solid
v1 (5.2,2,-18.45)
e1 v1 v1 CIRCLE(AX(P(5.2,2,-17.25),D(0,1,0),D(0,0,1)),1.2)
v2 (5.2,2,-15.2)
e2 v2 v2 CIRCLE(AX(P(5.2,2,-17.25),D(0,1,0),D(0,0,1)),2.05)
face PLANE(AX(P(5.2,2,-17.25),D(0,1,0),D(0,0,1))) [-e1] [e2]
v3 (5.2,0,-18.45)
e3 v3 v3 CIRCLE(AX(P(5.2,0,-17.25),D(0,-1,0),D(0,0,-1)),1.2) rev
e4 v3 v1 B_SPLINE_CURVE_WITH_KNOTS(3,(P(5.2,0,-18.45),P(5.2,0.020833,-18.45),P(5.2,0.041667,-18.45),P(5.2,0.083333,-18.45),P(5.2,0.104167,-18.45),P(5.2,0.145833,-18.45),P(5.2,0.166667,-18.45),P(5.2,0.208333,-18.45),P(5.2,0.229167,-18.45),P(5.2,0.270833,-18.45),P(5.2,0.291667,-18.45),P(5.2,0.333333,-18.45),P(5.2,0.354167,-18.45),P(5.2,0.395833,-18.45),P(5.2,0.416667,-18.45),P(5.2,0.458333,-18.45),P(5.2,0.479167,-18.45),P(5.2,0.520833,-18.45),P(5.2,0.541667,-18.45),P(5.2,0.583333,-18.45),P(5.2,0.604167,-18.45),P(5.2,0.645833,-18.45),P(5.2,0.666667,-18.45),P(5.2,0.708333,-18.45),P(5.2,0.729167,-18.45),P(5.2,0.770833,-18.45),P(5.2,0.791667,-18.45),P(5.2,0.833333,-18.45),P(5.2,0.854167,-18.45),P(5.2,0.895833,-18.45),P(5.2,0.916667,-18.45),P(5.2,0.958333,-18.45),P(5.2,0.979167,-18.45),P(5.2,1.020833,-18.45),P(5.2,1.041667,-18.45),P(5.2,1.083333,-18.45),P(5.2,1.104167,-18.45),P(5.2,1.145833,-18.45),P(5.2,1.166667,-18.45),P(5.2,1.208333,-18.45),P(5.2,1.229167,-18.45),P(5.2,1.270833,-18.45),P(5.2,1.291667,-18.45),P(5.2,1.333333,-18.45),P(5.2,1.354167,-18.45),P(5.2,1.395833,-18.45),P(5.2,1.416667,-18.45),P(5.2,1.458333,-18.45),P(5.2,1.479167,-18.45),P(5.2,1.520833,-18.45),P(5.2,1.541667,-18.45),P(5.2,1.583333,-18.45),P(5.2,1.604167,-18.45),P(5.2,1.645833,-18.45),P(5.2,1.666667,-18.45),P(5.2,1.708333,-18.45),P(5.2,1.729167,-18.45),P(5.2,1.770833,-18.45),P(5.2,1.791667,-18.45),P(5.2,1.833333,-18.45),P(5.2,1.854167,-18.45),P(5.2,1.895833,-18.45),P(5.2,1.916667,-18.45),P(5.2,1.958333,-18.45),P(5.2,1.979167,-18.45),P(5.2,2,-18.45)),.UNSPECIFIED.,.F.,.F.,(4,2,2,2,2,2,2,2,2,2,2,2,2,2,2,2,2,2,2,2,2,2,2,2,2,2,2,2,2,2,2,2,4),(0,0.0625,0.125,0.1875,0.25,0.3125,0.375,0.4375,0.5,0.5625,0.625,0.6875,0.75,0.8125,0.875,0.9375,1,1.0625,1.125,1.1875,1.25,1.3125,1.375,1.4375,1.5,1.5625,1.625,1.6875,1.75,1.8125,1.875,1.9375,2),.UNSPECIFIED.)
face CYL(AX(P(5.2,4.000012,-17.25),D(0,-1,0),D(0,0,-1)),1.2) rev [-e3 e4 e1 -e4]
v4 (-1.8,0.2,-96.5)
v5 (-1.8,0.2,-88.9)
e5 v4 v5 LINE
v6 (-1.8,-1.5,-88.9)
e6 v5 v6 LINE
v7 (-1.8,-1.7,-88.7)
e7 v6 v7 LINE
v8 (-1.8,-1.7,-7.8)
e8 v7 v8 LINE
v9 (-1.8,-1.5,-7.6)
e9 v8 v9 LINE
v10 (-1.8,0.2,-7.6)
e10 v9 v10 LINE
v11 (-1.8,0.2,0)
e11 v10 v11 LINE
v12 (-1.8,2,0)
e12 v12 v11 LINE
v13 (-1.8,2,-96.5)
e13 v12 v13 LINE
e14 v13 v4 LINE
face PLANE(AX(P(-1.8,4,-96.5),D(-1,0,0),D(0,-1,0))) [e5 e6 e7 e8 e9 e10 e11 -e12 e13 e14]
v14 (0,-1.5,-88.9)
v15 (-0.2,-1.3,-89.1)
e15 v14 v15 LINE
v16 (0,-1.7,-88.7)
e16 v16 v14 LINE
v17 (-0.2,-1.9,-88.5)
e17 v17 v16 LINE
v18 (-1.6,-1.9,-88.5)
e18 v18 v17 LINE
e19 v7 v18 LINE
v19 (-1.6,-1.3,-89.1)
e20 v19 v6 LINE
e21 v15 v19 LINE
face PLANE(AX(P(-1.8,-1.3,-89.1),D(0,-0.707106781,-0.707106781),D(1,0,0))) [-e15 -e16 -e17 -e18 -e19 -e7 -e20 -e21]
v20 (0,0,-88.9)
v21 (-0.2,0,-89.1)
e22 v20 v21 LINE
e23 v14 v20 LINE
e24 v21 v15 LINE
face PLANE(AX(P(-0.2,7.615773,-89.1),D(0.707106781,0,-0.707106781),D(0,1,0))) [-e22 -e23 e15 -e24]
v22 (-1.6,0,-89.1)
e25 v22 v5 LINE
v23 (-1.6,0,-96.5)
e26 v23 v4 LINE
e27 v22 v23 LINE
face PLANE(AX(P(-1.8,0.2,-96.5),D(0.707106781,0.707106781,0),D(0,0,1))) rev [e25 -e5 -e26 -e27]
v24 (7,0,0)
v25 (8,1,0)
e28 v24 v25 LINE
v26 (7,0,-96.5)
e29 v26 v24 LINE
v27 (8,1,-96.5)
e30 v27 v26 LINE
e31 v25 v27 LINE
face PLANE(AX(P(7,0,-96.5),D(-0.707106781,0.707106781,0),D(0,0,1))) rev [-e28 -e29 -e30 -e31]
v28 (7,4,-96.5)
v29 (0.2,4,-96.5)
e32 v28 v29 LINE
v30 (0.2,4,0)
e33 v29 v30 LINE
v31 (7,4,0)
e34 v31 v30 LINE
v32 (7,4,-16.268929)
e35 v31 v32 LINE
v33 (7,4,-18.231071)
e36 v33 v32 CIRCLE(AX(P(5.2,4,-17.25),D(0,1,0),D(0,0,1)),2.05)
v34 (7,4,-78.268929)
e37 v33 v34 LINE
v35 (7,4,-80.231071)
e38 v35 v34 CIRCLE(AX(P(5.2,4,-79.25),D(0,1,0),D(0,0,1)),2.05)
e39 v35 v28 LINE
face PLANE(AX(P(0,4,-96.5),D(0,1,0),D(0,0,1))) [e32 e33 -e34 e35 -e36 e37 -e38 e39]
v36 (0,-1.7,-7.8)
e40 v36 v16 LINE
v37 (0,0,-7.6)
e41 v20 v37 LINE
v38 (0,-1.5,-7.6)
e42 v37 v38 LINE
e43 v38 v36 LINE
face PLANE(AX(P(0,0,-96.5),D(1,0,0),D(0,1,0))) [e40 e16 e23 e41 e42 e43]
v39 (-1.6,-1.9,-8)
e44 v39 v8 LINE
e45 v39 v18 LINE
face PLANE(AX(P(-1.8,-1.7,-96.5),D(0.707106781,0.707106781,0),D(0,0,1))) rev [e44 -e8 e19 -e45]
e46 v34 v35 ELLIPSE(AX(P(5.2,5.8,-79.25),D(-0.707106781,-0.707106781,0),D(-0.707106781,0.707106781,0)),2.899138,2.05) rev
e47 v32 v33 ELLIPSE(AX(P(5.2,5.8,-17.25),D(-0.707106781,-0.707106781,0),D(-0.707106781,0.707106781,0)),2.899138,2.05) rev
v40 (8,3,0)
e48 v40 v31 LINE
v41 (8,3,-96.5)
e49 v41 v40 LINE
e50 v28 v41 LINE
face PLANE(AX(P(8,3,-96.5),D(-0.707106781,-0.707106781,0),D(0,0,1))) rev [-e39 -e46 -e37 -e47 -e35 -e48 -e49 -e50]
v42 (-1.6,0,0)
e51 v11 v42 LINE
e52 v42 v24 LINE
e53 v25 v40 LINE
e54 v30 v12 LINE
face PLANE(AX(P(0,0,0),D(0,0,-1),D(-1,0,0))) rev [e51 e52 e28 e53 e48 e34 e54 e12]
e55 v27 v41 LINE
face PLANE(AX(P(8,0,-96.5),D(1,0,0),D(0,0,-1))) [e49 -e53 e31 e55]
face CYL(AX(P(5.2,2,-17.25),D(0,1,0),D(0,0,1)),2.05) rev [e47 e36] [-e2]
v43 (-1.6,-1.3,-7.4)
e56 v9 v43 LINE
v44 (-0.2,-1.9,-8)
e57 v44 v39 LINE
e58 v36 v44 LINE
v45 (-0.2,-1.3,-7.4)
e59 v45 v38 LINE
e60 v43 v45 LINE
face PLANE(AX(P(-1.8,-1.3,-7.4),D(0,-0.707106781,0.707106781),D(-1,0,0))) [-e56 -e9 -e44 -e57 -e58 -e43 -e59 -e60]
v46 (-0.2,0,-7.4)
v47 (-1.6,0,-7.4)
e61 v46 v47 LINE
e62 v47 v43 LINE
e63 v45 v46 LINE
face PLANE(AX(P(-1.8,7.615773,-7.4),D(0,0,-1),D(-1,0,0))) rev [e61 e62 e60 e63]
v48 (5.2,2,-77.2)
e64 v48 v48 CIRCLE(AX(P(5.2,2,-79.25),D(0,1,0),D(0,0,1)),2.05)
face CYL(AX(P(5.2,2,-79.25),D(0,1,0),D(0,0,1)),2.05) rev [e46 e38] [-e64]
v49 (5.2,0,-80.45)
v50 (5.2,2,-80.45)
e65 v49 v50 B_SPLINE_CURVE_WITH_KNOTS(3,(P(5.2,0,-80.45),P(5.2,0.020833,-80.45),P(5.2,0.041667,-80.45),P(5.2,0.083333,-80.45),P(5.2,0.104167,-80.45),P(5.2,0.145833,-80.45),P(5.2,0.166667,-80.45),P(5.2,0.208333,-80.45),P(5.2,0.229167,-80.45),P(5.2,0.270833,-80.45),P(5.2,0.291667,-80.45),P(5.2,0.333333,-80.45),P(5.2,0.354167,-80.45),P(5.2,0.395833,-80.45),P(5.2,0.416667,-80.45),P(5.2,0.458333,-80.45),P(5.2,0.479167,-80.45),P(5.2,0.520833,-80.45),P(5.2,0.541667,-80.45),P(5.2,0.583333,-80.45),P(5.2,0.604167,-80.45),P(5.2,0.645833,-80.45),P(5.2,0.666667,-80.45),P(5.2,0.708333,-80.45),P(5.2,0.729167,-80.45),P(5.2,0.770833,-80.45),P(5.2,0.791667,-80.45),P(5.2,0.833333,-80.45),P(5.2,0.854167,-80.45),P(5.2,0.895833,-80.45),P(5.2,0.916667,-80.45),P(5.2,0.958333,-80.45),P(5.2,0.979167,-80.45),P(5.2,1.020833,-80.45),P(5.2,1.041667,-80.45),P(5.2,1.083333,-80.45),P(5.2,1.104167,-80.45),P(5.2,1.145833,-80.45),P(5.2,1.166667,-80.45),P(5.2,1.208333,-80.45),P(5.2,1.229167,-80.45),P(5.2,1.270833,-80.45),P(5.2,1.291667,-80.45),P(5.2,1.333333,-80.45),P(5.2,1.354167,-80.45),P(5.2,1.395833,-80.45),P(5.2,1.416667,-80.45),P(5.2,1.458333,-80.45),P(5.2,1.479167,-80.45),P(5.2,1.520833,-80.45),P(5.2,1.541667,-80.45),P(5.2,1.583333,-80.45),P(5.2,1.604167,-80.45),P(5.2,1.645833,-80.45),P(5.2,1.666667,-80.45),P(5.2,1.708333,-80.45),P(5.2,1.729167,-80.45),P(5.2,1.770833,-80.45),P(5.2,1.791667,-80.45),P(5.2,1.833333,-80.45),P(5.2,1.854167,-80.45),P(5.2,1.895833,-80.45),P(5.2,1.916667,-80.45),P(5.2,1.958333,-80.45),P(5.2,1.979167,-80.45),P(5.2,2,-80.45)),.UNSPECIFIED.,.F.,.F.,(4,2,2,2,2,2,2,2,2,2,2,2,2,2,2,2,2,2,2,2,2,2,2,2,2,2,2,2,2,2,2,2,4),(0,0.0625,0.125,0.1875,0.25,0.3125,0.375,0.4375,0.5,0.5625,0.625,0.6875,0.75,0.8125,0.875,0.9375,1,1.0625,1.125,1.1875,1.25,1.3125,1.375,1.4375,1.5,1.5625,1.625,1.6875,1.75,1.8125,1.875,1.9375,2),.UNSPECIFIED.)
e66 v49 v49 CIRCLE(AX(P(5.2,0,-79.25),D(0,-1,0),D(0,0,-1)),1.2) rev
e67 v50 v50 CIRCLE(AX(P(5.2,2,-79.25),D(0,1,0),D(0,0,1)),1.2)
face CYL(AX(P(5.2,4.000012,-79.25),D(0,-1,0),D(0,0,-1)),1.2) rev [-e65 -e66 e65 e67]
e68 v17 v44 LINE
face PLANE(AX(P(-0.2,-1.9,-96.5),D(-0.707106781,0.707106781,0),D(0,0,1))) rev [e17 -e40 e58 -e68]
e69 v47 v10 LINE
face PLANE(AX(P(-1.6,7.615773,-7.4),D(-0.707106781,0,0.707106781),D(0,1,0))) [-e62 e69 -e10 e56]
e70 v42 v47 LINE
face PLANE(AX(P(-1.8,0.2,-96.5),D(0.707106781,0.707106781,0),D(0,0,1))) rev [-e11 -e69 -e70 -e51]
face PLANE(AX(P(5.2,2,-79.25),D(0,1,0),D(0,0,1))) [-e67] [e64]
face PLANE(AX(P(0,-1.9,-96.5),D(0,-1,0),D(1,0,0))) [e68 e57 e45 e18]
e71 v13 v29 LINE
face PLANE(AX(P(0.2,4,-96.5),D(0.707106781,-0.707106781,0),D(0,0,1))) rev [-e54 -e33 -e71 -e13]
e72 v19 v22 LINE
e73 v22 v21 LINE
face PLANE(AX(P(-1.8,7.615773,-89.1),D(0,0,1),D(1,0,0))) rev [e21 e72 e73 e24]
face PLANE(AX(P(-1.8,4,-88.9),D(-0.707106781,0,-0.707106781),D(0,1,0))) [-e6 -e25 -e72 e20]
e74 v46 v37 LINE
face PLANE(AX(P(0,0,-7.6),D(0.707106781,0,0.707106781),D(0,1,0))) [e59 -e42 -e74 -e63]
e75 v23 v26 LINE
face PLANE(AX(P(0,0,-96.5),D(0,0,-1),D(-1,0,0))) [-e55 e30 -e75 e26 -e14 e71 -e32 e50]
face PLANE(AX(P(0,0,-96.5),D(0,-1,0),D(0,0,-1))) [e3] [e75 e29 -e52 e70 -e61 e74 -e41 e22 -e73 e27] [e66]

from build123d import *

# Parameters (mm, degrees)
EXTRUDE_1_DEPTH          = 96.5
CHAMFER_1_SIZE           = 1
CHAMFER_2_SIZE           = 1
CUT_EXTRUDE_1_DEPTH      = 98.010617976
CUT_EXTRUDE_1_DEPTH_BACK = 10
SKETCH_2_R               = 1.2
SKETCH_2_3_R             = 2.05
CUT_EXTRUDE_2_DEPTH      = 2
CHAMFER_3_SIZE           = 2
SKETCH_3_W               = 1.8
SKETCH_3_H               = 7.4
CUT_EXTRUDE_3_DEPTH      = 1.9
CHAMFER_4_SIZE           = 0.2
CHAMFER_5_SIZE           = 0.6


with BuildPart() as part:
    # 草图1 → 凸台-拉伸1 (new body)
    with BuildSketch(Plane.XY):
        Polygon((0, 0), (8, 0), (8, 4), (0, 4), (-1.8, 4), (-1.8, -1.9), (0, -1.9), align=None)
    extrude(amount=-EXTRUDE_1_DEPTH)

    # 倒角1
    chamfer_1_edges = [part.edges().sort_by_distance(p)[0] for p in [
        (8, 0, -48.25),
    ]]
    chamfer(chamfer_1_edges, length=CHAMFER_1_SIZE)

    # 倒角2
    chamfer_2_edges = [part.edges().sort_by_distance(p)[0] for p in [
        (8, 4, -48.25),
    ]]
    chamfer(chamfer_2_edges, length=CHAMFER_2_SIZE)

    # 草图2 → 切除-拉伸1 (cut, two sides: drawn at the far end of the back side and taken through both)
    with BuildSketch(Plane(origin=(0, 4, 0), x_dir=(1, 0, 0), z_dir=(0, 1, 0)).offset(-CUT_EXTRUDE_1_DEPTH_BACK)):
        with Locations(Location((5.2, 79.25, 0), (0, 0, 90))):
            Circle(SKETCH_2_R)
        with Locations(Location((5.2, 17.25, 0), (0, 0, 90))):
            Circle(SKETCH_2_R)
    extrude(amount=CUT_EXTRUDE_1_DEPTH + CUT_EXTRUDE_1_DEPTH_BACK, mode=Mode.SUBTRACT)

    # 草图2<3> → 切除-拉伸2 (cut)
    with BuildSketch(Plane(origin=(0, 4, 0), x_dir=(1, 0, 0), z_dir=(0, 1, 0))):
        with Locations(Location((5.2, 79.25, 0), (0, 0, 270))):
            Circle(SKETCH_2_3_R)
        with Locations(Location((5.2, 17.25, 0), (0, 0, 270))):
            Circle(SKETCH_2_3_R)
    extrude(amount=-CUT_EXTRUDE_2_DEPTH, mode=Mode.SUBTRACT)

    # 倒角3
    chamfer_3_edges = [part.edges().sort_by_distance(p)[0] for p in [
        (-1.8, 4, -48.25),
    ]]
    chamfer(chamfer_3_edges, length=CHAMFER_3_SIZE)

    # 草图3 → 切除-拉伸3 (cut)
    with BuildSketch(Plane.XZ.offset(1.9)):
        with Locations((-0.9, -92.8)):
            Rectangle(SKETCH_3_W, SKETCH_3_H)
        with Locations((-0.9, -3.7)):
            Rectangle(SKETCH_3_W, SKETCH_3_H)
    extrude(amount=-CUT_EXTRUDE_3_DEPTH, mode=Mode.SUBTRACT)

    # 倒角4
    chamfer_4_edges = [part.edges().sort_by_distance(p)[0] for p in [
        (-1.8, -1.9, -48.25),
        (0, -1.9, -48.25),
        (-1.8, -0.95, -89.1),
        (0, -0.95, -89.1),
        (-1.8, 0, -92.8),
        (-1.8, -0.95, -7.4),
        (0, -0.95, -7.4),
        (-1.8, 0, -3.7),
    ]]
    chamfer(chamfer_4_edges, length=CHAMFER_4_SIZE)

    # 倒角5
    # the kernel refuses this chamfer: 0.6 mm, written as the material it takes off along each edge
    with BuildSketch(Plane(origin=(1.343009793, -1.9, -89.1), x_dir=(0, 0.9996219169112965, -0.027495876610595982), z_dir=(-1, 0, 0))) as chamfer_5_piece_1:
        Polygon((CHAMFER_5_SIZE * 0.999621916911, -CHAMFER_5_SIZE * 0.0274958766106), (-CHAMFER_5_SIZE * 0.0274958766106, -CHAMFER_5_SIZE * 0.999621916911), (0, 0), align=None)
    extrude(amount=4.486019586, mode=Mode.SUBTRACT)
    with BuildSketch(Plane(origin=(1.343009793, -1.9, -7.4), x_dir=(0, 0.9996219169112968, 0.027495876610585925), z_dir=(-1, 0, 0))) as chamfer_5_piece_2:
        Polygon((CHAMFER_5_SIZE * 0.999621916911, CHAMFER_5_SIZE * 0.0274958766106), (-CHAMFER_5_SIZE * 0.0274958766106, CHAMFER_5_SIZE * 0.999621916911), (0, 0), align=None)
    extrude(amount=4.486019586, mode=Mode.SUBTRACT)


solid = part.part
